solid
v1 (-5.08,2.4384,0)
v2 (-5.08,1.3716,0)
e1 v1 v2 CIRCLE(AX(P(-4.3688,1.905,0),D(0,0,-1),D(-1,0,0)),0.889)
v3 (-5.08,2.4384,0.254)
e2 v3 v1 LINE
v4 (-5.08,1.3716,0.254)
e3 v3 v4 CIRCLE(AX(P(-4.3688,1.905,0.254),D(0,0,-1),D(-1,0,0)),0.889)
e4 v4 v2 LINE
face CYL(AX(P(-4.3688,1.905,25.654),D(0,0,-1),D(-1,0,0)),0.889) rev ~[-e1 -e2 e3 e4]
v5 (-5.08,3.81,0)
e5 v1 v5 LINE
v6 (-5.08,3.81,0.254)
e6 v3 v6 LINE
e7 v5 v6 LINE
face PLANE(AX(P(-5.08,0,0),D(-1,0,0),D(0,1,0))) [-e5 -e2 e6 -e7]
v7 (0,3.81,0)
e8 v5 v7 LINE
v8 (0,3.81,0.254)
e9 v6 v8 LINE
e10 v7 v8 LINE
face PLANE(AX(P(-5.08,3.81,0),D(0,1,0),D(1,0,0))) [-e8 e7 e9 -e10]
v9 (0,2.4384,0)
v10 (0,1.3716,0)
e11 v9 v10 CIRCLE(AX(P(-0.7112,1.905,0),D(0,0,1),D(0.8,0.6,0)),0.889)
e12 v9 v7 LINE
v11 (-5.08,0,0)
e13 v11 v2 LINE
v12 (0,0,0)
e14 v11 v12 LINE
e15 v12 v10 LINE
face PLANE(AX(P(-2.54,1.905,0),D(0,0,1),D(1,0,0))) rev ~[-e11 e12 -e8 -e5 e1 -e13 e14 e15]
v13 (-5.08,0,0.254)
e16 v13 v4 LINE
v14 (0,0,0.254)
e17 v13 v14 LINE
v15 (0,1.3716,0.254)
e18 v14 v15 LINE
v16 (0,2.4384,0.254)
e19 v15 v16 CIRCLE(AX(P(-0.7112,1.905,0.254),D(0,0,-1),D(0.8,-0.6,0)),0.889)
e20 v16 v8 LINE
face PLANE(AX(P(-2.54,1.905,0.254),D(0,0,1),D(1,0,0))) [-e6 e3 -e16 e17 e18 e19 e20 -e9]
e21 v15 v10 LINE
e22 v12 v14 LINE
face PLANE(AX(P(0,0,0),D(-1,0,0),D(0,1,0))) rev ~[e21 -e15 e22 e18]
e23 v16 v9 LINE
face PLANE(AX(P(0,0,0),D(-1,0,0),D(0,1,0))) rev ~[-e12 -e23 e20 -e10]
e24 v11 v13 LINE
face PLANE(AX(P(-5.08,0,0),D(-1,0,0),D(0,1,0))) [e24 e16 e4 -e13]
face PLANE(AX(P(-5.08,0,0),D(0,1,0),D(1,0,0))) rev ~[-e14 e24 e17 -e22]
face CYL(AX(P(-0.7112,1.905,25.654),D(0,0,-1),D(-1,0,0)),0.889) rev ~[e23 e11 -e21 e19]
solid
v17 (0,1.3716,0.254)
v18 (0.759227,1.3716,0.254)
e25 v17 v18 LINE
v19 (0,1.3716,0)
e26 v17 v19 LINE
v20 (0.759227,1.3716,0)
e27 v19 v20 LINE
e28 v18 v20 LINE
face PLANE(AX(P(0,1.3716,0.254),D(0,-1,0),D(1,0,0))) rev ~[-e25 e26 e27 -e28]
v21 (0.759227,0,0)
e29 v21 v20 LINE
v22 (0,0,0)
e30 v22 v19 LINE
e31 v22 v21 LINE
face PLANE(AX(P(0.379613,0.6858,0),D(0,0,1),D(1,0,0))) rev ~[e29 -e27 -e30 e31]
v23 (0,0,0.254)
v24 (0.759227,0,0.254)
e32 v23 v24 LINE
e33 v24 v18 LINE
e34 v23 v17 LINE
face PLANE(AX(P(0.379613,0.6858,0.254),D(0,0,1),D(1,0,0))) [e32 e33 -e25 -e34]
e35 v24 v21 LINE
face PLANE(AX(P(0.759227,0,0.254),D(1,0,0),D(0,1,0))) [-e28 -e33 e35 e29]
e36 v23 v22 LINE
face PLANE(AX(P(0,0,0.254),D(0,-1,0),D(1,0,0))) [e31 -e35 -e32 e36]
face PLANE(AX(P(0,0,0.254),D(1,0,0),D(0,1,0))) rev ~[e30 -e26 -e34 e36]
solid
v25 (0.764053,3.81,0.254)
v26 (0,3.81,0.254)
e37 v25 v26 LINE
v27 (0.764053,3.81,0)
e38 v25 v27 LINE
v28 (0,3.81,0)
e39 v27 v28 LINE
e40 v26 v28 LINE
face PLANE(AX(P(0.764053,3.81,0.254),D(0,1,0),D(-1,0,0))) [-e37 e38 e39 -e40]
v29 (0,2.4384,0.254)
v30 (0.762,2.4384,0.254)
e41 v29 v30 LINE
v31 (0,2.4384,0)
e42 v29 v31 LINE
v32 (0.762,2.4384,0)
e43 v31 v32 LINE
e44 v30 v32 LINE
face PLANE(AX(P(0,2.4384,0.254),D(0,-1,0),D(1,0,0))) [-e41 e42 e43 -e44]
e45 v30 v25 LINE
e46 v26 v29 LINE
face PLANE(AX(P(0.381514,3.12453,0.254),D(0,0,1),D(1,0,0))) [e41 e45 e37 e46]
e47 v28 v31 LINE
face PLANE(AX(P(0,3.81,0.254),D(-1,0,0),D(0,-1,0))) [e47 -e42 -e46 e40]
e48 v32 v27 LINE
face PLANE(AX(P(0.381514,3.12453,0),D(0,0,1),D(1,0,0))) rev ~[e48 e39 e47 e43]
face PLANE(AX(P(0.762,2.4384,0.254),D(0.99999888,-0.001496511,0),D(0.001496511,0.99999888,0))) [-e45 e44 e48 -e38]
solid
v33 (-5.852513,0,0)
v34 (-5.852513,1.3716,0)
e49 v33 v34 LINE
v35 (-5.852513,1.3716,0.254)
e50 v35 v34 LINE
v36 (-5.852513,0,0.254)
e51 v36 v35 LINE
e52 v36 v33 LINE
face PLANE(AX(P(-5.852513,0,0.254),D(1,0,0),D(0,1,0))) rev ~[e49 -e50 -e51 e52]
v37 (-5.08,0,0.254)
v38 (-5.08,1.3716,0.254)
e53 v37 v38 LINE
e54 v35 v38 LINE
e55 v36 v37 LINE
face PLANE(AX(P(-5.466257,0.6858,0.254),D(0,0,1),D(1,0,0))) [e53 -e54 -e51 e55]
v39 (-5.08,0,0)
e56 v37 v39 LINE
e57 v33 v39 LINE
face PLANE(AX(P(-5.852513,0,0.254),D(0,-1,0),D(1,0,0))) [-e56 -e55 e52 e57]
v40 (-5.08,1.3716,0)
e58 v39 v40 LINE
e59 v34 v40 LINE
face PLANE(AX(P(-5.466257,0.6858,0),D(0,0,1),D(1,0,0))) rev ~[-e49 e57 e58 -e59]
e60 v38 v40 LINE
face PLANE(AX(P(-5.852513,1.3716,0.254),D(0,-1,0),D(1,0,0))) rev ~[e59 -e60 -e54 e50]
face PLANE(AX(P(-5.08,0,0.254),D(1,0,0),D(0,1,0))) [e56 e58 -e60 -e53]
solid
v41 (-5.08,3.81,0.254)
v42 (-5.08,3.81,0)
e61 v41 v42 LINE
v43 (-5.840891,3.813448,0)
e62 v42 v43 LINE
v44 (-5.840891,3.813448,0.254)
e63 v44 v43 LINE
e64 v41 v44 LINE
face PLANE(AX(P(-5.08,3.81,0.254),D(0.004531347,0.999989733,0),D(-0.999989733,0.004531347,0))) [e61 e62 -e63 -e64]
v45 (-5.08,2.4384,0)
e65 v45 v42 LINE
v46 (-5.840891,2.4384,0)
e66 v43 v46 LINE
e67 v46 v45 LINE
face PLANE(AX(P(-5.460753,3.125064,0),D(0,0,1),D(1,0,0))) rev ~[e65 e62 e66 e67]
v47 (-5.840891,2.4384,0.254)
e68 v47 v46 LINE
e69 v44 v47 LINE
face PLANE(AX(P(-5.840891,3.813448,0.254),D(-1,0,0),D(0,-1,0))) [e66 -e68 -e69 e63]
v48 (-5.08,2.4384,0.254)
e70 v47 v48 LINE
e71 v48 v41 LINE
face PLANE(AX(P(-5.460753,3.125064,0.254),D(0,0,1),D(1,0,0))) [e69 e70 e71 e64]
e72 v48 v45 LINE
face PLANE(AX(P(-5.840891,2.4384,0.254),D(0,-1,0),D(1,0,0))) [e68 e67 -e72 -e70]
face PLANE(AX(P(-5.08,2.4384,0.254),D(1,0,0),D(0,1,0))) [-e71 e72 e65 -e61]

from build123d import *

# Parameters (mm, degrees)
F0_W      = 5.08
F0_H      = 3.81
F1_DEPTH  = 0.254
F3_D      = 1.778
F3_DEPTH  = 25.4
F3_TIP    = 0.5341650903
F5_D      = 1.778
F5_DEPTH  = 25.4
F5_TIP    = 0.5341650903
F7_DEPTH  = 0.254
F9_DEPTH  = 0.254
F10_W     = 0.7592265029
F10_H     = 1.3716
F11_DEPTH = 0.254
F12_W     = 0.7725130153
F12_H     = 1.3716
F13_DEPTH = 0.254


# Not quite as in the source:
# - a feature names something its author has since deleted; it is built from what else it names


with BuildPart() as f1:
    # F0 (on Top) → F1 (new body)
    with BuildSketch(Plane.XY):
        with Locations((-2.54, 1.905)):
            Rectangle(F0_W, F0_H)
    extrude(amount=F1_DEPTH)

    # F3
    with Locations(Plane.XY.offset(0.254)):
        with Locations((-4.3688, 1.905)):
            Hole(F3_D / 2, depth=F3_DEPTH)
            with Locations((0, 0, -(F3_DEPTH + F3_TIP / 2))):  # 118° drill point
                Cone(0, F3_D / 2, F3_TIP, mode=Mode.SUBTRACT)

    # F5
    with Locations(Plane.XY.offset(0.254)):
        with Locations((-0.7112, 1.905)):
            Hole(F5_D / 2, depth=F5_DEPTH)
            with Locations((0, 0, -(F5_DEPTH + F5_TIP / 2))):  # 118° drill point
                Cone(0, F5_D / 2, F5_TIP, mode=Mode.SUBTRACT)


with BuildPart() as f7:
    # F6 (on face) → F7 (new body)
    with BuildSketch(Plane.XY.offset(0.254)):
        Polygon((0.7640526164, 3.81), (0, 3.81), (0, 2.4384), (0.762, 2.4384), align=None)
    extrude(amount=-F7_DEPTH)


with BuildPart() as f9:
    # F8 (on face) → F9 (new body)
    with BuildSketch(Plane.XY.offset(0.254)):
        Polygon((-5.8408910409, 2.4384), (-5.08, 2.4384), (-5.08, 3.81), (-5.8408910409, 3.8134478964), align=None)
    extrude(amount=-F9_DEPTH)


with BuildPart() as f11:
    # F10 (on face) → F11 (new body)
    with BuildSketch(Plane.XY.offset(0.254)):
        with Locations((0.3796132514, 0.6858)):
            Rectangle(F10_W, F10_H)
    extrude(amount=-F11_DEPTH)


with BuildPart() as f13:
    # F12 (on face) → F13 (new body)
    with BuildSketch(Plane.XY.offset(0.254)):
        with Locations((-5.4662565076, 0.6858)):
            Rectangle(F12_W, F12_H)
    extrude(amount=-F13_DEPTH)


solid = Compound([f1.part, f7.part, f9.part, f11.part, f13.part])
